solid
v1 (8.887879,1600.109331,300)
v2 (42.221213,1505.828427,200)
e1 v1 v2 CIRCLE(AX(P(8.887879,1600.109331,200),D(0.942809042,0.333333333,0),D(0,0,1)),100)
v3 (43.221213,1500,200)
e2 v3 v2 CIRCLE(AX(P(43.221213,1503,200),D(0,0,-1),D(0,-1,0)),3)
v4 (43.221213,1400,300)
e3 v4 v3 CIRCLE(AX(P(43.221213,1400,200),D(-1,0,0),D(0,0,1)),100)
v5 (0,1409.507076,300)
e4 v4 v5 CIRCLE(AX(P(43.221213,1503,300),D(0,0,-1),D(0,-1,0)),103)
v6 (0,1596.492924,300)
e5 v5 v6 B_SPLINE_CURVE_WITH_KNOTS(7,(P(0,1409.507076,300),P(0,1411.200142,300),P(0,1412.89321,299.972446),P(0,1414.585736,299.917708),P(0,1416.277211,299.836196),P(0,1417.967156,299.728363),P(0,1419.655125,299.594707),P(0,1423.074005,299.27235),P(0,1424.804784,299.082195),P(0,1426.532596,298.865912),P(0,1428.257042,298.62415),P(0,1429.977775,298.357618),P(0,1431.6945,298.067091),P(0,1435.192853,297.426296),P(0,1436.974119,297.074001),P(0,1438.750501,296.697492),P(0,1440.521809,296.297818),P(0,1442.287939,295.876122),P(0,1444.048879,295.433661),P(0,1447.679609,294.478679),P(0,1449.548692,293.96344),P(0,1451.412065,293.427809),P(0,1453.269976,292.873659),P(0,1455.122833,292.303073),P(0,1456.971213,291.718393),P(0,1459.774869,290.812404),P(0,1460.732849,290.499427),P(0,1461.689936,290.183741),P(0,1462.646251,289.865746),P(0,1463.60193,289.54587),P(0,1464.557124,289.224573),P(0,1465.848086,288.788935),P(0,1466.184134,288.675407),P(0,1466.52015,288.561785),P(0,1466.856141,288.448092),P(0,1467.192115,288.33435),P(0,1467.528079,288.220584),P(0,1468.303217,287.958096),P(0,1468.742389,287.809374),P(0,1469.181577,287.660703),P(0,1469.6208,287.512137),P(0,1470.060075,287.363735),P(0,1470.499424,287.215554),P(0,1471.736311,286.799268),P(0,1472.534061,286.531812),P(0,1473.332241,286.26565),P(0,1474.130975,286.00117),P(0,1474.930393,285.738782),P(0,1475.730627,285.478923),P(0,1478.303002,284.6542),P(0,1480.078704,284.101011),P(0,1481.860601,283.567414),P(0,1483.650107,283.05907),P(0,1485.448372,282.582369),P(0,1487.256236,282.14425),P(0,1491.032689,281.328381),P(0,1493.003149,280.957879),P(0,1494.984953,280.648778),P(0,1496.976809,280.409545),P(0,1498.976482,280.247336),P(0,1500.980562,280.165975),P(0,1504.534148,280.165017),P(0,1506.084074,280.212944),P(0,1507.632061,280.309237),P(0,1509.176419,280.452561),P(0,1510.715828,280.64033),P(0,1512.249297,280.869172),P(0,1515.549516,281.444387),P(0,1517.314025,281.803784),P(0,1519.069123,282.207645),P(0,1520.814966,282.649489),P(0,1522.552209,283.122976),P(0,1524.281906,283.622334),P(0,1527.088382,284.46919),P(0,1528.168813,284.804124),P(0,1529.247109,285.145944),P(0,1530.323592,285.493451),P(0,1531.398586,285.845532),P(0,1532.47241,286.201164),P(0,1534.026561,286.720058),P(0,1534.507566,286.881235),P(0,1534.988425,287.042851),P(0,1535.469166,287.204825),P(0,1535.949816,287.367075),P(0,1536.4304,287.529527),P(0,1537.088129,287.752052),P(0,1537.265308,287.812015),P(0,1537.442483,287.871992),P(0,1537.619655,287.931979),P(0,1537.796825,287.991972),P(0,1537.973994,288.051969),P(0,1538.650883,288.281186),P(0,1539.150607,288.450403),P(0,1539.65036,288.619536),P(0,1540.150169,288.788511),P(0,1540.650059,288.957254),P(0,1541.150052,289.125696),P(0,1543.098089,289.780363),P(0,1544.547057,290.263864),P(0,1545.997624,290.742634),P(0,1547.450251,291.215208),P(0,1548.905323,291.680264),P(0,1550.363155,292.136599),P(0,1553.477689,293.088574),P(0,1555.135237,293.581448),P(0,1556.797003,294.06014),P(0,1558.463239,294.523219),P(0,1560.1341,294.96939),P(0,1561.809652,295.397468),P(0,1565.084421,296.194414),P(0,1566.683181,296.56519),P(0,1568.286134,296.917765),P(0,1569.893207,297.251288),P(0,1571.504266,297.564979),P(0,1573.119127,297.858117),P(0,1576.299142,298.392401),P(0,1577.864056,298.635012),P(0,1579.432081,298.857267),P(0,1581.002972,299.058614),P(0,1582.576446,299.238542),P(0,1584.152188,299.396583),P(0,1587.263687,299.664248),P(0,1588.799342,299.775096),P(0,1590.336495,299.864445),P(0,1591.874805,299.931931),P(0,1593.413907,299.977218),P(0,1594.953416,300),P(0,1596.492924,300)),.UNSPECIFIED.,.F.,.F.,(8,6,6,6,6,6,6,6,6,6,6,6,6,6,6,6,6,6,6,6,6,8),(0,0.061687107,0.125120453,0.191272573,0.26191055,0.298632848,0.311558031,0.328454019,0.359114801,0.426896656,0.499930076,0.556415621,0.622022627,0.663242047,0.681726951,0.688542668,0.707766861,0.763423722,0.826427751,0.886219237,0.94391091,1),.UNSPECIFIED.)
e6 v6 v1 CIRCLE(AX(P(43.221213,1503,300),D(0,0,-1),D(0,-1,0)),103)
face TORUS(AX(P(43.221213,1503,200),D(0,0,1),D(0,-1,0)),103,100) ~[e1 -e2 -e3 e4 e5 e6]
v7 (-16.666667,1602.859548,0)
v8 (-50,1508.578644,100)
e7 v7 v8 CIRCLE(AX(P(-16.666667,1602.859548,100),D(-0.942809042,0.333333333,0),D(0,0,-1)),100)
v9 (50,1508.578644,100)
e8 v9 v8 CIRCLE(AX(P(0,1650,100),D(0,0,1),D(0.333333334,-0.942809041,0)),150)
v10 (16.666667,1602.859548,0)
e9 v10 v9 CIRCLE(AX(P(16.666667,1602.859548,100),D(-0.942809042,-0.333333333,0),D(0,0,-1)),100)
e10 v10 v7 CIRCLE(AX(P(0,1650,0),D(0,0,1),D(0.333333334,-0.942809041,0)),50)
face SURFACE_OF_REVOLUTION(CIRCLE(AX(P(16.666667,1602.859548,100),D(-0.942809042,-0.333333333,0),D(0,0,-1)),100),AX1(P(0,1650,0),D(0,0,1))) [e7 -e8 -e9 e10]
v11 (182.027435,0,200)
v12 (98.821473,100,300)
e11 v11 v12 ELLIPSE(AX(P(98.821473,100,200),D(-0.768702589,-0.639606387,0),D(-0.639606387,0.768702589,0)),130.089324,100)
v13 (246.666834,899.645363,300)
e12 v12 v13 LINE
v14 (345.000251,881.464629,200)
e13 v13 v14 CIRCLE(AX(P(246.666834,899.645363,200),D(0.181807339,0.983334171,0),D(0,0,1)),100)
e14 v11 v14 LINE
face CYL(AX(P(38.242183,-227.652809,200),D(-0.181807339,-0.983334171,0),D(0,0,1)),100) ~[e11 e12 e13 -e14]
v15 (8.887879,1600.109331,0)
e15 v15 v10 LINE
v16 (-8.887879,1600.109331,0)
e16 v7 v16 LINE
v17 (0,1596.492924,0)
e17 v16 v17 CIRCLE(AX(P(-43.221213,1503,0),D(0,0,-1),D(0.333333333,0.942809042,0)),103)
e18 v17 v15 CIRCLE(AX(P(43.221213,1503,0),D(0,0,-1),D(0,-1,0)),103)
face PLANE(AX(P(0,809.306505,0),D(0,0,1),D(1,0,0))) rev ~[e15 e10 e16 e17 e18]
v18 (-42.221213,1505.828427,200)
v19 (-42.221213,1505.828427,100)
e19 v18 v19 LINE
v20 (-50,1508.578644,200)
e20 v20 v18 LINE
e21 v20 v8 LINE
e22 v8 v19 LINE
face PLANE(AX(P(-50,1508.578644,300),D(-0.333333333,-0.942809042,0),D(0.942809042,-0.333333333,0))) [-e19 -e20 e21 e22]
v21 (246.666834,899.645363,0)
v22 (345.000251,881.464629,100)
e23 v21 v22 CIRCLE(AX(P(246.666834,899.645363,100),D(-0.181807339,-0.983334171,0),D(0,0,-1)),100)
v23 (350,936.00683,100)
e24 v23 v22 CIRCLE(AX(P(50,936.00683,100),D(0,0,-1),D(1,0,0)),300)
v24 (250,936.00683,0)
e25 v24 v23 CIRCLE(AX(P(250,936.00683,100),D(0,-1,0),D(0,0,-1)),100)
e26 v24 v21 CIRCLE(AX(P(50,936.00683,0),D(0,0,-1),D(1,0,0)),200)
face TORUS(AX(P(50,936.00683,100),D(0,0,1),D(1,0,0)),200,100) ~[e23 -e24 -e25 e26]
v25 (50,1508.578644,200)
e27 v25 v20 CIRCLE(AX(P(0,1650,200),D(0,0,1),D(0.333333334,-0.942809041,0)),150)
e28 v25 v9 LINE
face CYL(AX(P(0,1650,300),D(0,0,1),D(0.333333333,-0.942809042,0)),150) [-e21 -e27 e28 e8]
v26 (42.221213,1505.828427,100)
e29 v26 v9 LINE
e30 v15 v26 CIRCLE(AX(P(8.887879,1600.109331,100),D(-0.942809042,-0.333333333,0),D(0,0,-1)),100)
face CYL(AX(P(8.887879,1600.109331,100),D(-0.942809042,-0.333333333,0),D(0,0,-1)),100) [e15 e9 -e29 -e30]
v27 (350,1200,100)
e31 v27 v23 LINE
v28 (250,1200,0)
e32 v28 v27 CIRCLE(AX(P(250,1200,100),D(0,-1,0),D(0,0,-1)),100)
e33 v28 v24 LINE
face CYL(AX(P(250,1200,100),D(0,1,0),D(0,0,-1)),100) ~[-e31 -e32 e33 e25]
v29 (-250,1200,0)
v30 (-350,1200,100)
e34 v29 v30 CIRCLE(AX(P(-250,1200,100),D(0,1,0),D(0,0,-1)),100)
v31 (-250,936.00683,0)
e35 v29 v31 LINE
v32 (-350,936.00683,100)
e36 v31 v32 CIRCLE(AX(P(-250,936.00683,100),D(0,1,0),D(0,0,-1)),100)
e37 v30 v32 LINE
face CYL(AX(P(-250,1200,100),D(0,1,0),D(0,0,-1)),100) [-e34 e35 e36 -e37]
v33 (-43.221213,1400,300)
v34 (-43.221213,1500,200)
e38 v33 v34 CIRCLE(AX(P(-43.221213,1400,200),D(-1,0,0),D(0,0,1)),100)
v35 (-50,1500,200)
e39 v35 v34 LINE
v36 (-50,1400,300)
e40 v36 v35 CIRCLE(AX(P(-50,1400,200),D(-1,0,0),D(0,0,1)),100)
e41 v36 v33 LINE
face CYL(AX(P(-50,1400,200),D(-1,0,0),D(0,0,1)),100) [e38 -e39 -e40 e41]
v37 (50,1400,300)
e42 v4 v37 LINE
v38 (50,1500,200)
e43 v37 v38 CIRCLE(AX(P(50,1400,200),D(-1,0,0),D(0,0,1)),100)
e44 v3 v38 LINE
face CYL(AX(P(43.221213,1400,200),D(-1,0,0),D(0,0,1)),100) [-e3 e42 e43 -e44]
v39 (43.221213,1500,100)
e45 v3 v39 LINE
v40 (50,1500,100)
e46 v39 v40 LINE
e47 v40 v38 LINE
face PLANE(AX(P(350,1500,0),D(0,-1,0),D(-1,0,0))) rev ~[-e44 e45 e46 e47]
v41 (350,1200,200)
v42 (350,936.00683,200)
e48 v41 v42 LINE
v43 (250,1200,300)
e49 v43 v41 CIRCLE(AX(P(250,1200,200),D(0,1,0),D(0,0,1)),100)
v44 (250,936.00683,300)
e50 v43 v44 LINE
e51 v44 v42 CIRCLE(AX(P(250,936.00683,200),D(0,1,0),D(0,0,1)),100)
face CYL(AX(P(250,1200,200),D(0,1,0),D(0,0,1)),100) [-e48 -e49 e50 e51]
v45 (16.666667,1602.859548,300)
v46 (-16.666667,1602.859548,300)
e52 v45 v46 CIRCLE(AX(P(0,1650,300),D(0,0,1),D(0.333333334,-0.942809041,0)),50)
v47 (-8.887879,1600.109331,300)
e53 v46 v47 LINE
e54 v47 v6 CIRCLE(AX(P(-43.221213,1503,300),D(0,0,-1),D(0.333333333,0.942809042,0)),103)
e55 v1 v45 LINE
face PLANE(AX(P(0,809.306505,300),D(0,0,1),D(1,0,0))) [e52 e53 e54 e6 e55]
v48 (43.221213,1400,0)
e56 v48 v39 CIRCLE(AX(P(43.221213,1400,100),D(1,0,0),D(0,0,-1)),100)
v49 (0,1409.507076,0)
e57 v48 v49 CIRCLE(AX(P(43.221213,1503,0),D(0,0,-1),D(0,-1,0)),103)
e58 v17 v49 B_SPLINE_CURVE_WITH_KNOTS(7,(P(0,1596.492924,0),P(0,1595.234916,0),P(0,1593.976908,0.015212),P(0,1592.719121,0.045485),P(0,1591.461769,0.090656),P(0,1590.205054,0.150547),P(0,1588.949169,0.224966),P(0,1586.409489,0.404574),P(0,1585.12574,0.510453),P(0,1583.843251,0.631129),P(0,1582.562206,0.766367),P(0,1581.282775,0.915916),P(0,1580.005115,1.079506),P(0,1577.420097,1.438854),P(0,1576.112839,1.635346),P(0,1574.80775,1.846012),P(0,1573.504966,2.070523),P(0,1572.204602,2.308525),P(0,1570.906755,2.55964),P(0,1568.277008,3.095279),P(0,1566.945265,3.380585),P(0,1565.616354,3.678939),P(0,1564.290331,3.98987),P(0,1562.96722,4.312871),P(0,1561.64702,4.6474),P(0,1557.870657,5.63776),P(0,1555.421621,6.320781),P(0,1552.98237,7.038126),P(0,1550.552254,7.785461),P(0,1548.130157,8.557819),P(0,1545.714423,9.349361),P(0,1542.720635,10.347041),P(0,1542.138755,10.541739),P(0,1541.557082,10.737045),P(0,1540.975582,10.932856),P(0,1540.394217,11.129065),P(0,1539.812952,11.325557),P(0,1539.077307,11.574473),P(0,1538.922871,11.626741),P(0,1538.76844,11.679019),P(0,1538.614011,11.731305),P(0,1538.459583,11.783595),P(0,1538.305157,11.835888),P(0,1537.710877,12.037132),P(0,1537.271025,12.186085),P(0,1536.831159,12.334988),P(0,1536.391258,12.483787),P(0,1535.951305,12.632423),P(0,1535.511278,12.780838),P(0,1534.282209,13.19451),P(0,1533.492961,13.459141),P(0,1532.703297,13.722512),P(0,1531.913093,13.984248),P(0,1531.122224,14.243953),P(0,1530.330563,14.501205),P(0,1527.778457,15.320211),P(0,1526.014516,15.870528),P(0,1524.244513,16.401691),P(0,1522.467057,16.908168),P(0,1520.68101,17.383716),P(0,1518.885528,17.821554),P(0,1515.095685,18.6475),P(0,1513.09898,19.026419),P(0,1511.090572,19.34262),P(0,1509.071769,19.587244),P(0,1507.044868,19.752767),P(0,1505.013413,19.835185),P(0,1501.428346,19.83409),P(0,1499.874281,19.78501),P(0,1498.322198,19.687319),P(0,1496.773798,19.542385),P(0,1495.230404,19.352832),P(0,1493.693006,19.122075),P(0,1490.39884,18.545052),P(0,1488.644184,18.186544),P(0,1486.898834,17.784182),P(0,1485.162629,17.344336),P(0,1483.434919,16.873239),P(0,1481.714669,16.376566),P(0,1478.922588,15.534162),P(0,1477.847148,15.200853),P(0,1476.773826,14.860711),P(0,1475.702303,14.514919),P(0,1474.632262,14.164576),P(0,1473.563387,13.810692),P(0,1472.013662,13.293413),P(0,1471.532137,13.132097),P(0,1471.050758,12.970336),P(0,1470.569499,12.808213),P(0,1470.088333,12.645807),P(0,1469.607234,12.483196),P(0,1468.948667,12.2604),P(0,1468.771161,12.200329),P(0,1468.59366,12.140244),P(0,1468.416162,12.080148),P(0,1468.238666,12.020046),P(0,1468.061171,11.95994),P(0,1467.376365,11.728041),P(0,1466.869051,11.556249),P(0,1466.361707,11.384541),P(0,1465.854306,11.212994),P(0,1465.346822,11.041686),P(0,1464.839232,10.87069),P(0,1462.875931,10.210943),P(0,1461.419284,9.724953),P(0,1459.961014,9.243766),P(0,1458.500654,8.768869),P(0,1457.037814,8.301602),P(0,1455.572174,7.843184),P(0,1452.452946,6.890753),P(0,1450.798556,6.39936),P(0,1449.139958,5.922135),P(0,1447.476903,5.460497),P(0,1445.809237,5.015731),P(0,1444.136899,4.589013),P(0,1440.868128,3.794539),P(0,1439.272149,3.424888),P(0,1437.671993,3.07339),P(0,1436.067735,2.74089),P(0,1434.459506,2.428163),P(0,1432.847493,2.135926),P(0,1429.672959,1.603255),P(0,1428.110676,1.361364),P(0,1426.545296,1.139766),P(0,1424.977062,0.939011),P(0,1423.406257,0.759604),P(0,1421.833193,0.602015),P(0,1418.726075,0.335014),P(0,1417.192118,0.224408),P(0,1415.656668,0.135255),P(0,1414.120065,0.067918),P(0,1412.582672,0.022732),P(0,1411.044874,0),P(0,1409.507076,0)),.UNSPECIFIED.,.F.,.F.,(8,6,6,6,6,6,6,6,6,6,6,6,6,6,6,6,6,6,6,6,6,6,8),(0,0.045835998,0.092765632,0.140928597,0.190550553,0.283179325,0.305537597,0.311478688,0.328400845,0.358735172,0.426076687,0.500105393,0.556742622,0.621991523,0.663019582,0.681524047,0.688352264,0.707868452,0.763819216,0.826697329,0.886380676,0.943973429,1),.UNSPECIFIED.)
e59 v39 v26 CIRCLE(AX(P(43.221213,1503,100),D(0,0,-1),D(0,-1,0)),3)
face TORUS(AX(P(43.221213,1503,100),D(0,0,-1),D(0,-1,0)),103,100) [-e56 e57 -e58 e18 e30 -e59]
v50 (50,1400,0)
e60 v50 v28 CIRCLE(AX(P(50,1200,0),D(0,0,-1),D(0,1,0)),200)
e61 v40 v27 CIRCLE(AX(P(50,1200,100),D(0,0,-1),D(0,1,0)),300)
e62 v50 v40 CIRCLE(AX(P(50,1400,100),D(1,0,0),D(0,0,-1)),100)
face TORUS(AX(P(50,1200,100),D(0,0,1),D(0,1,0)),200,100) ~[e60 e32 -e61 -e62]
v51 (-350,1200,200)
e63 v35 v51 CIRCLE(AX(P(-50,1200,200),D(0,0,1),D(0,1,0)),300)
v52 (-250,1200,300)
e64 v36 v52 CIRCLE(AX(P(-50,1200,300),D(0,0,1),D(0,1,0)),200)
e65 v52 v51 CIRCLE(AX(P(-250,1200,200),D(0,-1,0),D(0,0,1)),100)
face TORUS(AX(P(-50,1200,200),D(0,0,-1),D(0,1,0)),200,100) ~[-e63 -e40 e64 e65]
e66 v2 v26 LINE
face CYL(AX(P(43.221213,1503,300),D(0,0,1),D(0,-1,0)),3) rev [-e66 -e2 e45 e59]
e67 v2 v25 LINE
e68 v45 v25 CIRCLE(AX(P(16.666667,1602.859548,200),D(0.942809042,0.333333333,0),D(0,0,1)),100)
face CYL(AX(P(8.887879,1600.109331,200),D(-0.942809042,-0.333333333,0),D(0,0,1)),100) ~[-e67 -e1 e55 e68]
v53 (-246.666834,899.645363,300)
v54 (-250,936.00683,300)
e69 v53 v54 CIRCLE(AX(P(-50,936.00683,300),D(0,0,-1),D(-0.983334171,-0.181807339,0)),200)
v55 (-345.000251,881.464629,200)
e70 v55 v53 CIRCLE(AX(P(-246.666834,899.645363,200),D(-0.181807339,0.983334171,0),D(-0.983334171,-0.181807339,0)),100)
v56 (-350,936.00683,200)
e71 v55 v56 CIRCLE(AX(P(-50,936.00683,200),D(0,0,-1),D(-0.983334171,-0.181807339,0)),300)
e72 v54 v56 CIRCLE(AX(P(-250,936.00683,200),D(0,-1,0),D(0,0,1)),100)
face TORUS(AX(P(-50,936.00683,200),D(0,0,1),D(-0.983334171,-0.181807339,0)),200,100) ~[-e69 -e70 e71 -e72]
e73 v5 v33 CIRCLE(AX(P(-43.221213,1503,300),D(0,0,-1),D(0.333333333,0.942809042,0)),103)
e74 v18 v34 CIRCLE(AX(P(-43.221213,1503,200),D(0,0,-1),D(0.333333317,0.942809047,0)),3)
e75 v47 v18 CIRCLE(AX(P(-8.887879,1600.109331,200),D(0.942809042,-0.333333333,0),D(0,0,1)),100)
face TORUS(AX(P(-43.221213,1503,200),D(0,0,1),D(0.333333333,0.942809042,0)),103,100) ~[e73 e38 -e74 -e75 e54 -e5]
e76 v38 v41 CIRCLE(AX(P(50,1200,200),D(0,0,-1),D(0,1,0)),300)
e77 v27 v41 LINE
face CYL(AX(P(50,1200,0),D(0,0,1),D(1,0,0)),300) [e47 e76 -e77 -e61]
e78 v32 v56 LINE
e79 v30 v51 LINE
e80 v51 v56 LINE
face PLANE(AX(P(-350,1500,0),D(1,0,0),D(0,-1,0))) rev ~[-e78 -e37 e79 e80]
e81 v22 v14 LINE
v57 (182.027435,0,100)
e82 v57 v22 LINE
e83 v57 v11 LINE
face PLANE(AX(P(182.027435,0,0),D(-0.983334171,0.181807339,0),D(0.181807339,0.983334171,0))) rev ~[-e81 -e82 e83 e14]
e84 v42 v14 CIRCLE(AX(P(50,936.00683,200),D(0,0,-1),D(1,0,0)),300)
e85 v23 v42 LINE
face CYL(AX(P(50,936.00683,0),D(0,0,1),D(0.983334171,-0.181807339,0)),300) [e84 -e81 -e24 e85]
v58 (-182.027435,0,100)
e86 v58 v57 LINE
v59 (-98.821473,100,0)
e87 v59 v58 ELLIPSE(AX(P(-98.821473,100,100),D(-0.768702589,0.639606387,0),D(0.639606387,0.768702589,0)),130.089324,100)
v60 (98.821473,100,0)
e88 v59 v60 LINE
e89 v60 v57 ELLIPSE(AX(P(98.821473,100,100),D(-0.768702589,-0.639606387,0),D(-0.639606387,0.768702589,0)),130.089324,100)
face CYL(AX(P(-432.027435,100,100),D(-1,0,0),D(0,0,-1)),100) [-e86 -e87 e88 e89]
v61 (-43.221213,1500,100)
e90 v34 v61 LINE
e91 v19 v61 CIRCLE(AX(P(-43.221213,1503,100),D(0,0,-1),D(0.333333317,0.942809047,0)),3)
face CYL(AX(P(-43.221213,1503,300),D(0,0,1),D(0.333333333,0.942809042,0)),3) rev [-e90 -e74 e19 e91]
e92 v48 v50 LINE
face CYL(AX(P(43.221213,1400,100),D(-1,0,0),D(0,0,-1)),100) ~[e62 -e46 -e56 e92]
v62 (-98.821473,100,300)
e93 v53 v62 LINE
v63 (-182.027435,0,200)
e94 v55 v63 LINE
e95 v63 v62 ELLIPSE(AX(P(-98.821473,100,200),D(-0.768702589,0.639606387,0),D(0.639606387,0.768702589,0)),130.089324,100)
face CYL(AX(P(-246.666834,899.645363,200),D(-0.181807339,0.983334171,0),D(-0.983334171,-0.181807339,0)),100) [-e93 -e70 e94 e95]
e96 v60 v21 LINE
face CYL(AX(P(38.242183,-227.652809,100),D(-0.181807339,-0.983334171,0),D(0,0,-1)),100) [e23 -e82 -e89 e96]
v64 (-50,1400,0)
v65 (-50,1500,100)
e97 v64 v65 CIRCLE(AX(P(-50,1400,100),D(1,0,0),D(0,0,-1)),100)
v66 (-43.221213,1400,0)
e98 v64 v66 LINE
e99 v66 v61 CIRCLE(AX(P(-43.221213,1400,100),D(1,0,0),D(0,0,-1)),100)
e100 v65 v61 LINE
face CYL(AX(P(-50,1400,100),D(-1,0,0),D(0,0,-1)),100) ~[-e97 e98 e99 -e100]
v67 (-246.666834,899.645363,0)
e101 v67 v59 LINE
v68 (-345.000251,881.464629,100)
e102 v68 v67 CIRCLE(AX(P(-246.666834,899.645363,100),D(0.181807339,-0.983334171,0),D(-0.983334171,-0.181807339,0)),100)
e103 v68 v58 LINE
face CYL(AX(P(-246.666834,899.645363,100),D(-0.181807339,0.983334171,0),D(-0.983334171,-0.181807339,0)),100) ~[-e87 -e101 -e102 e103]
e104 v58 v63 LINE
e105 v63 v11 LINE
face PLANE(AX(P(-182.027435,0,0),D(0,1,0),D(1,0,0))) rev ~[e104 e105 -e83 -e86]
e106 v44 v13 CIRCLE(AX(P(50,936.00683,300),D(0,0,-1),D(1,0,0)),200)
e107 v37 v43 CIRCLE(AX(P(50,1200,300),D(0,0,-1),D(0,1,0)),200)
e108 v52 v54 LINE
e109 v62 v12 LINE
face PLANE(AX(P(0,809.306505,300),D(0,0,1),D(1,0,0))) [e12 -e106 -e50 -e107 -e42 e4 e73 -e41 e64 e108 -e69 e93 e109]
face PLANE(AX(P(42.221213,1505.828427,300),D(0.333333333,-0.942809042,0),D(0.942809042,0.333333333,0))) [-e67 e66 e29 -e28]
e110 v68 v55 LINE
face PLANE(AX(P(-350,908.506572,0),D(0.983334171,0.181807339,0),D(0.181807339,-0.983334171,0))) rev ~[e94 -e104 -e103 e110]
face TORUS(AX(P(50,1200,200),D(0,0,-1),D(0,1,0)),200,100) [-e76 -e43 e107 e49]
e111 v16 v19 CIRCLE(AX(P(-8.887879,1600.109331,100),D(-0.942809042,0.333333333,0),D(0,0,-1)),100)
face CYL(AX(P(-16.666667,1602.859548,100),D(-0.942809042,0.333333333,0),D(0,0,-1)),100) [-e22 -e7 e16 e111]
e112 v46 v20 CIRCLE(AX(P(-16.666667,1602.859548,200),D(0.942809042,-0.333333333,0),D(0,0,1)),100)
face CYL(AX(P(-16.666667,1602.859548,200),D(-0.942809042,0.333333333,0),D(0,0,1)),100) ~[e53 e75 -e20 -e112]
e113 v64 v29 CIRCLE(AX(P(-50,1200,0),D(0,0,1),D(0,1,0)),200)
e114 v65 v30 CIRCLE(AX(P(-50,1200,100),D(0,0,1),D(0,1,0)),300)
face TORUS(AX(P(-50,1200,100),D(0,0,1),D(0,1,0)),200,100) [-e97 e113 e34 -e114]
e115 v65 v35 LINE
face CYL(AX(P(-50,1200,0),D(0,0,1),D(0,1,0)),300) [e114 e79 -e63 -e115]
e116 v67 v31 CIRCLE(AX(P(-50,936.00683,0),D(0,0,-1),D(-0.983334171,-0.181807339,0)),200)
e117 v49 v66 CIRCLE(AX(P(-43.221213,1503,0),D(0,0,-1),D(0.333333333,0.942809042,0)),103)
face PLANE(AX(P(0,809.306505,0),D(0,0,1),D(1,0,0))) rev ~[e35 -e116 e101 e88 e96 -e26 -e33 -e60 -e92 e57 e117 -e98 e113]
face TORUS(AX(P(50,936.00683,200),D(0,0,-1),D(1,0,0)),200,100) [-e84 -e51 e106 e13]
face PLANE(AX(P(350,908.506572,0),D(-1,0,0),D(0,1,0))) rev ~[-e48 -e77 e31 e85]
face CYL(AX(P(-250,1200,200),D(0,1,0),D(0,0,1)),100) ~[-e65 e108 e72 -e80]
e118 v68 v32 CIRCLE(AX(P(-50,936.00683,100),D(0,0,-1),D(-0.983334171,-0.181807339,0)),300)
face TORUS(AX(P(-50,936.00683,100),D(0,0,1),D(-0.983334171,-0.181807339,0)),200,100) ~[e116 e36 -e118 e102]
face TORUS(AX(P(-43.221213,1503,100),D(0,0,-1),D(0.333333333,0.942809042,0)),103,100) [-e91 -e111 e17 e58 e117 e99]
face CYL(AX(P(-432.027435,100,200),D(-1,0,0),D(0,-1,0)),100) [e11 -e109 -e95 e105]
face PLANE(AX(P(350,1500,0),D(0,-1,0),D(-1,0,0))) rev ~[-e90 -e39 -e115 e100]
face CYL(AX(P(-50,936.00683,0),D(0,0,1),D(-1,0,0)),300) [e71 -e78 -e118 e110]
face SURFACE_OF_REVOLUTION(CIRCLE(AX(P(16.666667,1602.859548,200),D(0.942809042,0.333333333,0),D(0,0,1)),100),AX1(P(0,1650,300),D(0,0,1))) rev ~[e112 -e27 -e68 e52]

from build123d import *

# Parameters (mm, degrees)
F1_DEPTH     = 300
F2_R         = 300
F4_DEPTH     = 300
F5_T1_DEPTH  = 1146.4039437128
F5_T3_DEPTH  = 864.0548707486
F5_T5_DEPTH  = 1146.4039437128
F5_T7_DEPTH  = 263.9931695697
F5_T9_DEPTH  = 6.7787873377
F5_T11_DEPTH = 8.2506499138
F5_T13_DEPTH = 8.2506499138
F5_T15_DEPTH = 6.7787873377
F5_T18_ANGLE = 10.4750499308
F5_T20_ANGLE = 90
F5_T22_ANGLE = 160.5287793655
F5_T24_ANGLE = 321.057558731
F5_T26_ANGLE = 160.5287793655
F5_T28_ANGLE = 90
F5_T30_ANGLE = 10.4750499308
F5_T32_ANGLE = 10.4750499308
F5_T34_ANGLE = 90
F5_T36_ANGLE = 160.5287793655
F5_T38_ANGLE = 321.057558731
F5_T40_ANGLE = 160.5287793655
F5_T42_ANGLE = 90
F5_T44_ANGLE = 10.4750499308


# Not quite as in the source:
# - a fillet or chamfer that OpenCascade refuses, or shapes differently, is made with other operations: its cross-section is extruded or revolved along the edge and cut away or added


with BuildPart() as f1:
    # F0 (on Top) → F1 (new body)
    with BuildSketch(Plane.XY):
        Polygon((-182.0274353743, 0), (0, 0), (182.0274353743, 0), (350, 908.5065722466), (350, 1500), (-350, 1500), (-350, 908.5065722466), align=None)
    extrude(amount=F1_DEPTH)

    # F2
    f2_edges = [f1.edges().sort_by_distance(p)[0] for p in [
        (350, 1500, 150),
        (-350, 1500, 150),
        (-350, 908.506572, 150),
        (350, 908.506572, 150),
    ]]
    fillet(f2_edges, radius=F2_R)

    # F3 (on face) → F4 (join, through all)
    with BuildSketch(Plane.XY.offset(300)):
        with BuildLine():
            ThreePointArc((50, 1508.5786437627), (122.4744871392, 1563.3974596216), (150, 1650))
            ThreePointArc((150, 1650), (-86.6025403784, 1772.4744871392), (-50, 1508.5786437627))
            ThreePointArc((-50, 1508.5786437627), (0, 1500), (50, 1508.5786437627))
        make_face()
        with BuildLine():
            Line((42.2212126623, 1505.8284271247), (50, 1508.5786437627))
            ThreePointArc((50, 1508.5786437627), (25.3652965741, 1502.1602160117), (-4.764e-07, 1500))
            Line((-4.764e-07, 1500), (43.2212126623, 1500))
            ThreePointArc((43.2212126623, 1500), (40.2644169833, 1502.4926940638), (42.2212126623, 1505.8284271247))
        make_face()
        with BuildLine():
            ThreePointArc((-4.764e-07, 1500), (-25.3652970436, 1502.1602160923), (-50, 1508.5786437627))
            Line((-50, 1508.5786437627), (-42.2212126623, 1505.8284271247))
            ThreePointArc((-42.2212126623, 1505.8284271247), (-40.2644169834, 1502.4926940638), (-43.2212126623, 1500))
            Line((-43.2212126623, 1500), (-4.764e-07, 1500))
        make_face()
    extrude(amount=-F4_DEPTH)

    # F5: fillet of radius 100 on 32 edges, made by hand

    # F5_s2 → F5_t1 (cut)
    with BuildSketch(Plane(origin=(-168.9895340673, 914.0070146762, 0), x_dir=(0, 0, 1), z_dir=(0.1818073392, -0.9833341708, 0))):
        with BuildLine():
            ThreePointArc((100, 178.9937972219), (29.2893218813, 149.7044753406), (0, 78.9937972219))
            Line((0, 78.9937972219), (0, 178.9937972219))
            Line((0, 178.9937972219), (100, 178.9937972219))
        make_face()
        with BuildLine():
            ThreePointArc((200, 178.9937972219), (270.7106781187, 149.7044753406), (300, 78.9937972219))
            Line((300, 78.9937972219), (300, 178.9937972219))
            Line((300, 178.9937972219), (200, 178.9937972219))
        make_face()
    extrude(amount=F5_T1_DEPTH, mode=Mode.SUBTRACT)

    # F5_s4 → F5_t3 (cut)
    with BuildSketch(Plane.YZ.offset(-432.0274353743)):
        with BuildLine():
            ThreePointArc((100, 0), (29.2893218813, 29.2893218813), (0, 100))
            Line((0, 100), (0, 0))
            Line((0, 0), (100, 0))
        make_face()
        with BuildLine():
            ThreePointArc((0, 200), (29.2893218813, 270.7106781187), (100, 300))
            Line((100, 300), (0, 300))
            Line((0, 300), (0, 200))
        make_face()
    extrude(amount=F5_T3_DEPTH, mode=Mode.SUBTRACT)

    # F5_s6 → F5_t5 (cut)
    with BuildSketch(Plane(origin=(-39.4351165914, -213.2911566867, 0), x_dir=(0, 0, 1), z_dir=(0.1818073392, 0.9833341708, 0))):
        with BuildLine():
            ThreePointArc((0, 78.9937972219), (29.2893218813, 149.7044753406), (100, 178.9937972219))
            Line((100, 178.9937972219), (0, 178.9937972219))
            Line((0, 178.9937972219), (0, 78.9937972219))
        make_face()
        with BuildLine():
            ThreePointArc((300, 78.9937972219), (270.7106781187, 149.7044753406), (200, 178.9937972219))
            Line((200, 178.9937972219), (300, 178.9937972219))
            Line((300, 178.9937972219), (300, 78.9937972219))
        make_face()
    extrude(amount=F5_T5_DEPTH, mode=Mode.SUBTRACT)

    # F5_s8 → F5_t7 (cut)
    with BuildSketch(Plane.XZ.offset(-1200)):
        with BuildLine():
            ThreePointArc((250, 0), (320.7106781187, 29.2893218813), (350, 100))
            Line((350, 100), (350, 0))
            Line((350, 0), (250, 0))
        make_face()
        with BuildLine():
            ThreePointArc((-250, 0), (-320.7106781187, 29.2893218813), (-350, 100))
            Line((-350, 100), (-350, 0))
            Line((-350, 0), (-250, 0))
        make_face()
        with BuildLine():
            ThreePointArc((250, 300), (320.7106781187, 270.7106781187), (350, 200))
            Line((350, 200), (350, 300))
            Line((350, 300), (250, 300))
        make_face()
        with BuildLine():
            ThreePointArc((-250, 300), (-320.7106781187, 270.7106781187), (-350, 200))
            Line((-350, 200), (-350, 300))
            Line((-350, 300), (-250, 300))
        make_face()
    extrude(amount=F5_T7_DEPTH, mode=Mode.SUBTRACT)

    # F5_s10 → F5_t9 (cut)
    with BuildSketch(Plane.YZ.offset(43.2212126623)):
        with BuildLine():
            ThreePointArc((1400, 0), (1470.7106781187, 29.2893218813), (1500, 100))
            Line((1500, 100), (1500, 0))
            Line((1500, 0), (1400, 0))
        make_face()
        with BuildLine():
            ThreePointArc((1400, 300), (1470.7106781187, 270.7106781187), (1500, 200))
            Line((1500, 200), (1500, 300))
            Line((1500, 300), (1400, 300))
        make_face()
    extrude(amount=F5_T9_DEPTH, mode=Mode.SUBTRACT)

    # F5_s12 → F5_t11 (cut)
    with BuildSketch(Plane(origin=(510.7661855325, 180.5831166954, 0), x_dir=(0, 0, 1), z_dir=(0.9428090416, 0.3333333333, 0))):
        with BuildLine():
            ThreePointArc((0, -1505.6349186104), (29.2893218813, -1434.9242404917), (100, -1405.6349186104))
            Line((100, -1405.6349186104), (0, -1405.6349186104))
            Line((0, -1405.6349186104), (0, -1505.6349186104))
        make_face()
        with BuildLine():
            ThreePointArc((300, -1505.6349186104), (270.7106781187, -1434.9242404917), (200, -1405.6349186104))
            Line((200, -1405.6349186104), (300, -1405.6349186104))
            Line((300, -1405.6349186104), (300, -1505.6349186104))
        make_face()
    extrude(amount=F5_T11_DEPTH, mode=Mode.SUBTRACT)

    # F5_s14 → F5_t13 (cut)
    with BuildSketch(Plane(origin=(-518.5449728702, 183.3333333334, 0), x_dir=(0, 0, 1), z_dir=(0.9428090416, -0.3333333333, 0))):
        with BuildLine():
            ThreePointArc((0, -1505.6349186104), (29.2893218813, -1434.9242404917), (100, -1405.6349186104))
            Line((100, -1405.6349186104), (0, -1405.6349186104))
            Line((0, -1405.6349186104), (0, -1505.6349186104))
        make_face()
        with BuildLine():
            ThreePointArc((300, -1505.6349186104), (270.7106781187, -1434.9242404917), (200, -1405.6349186104))
            Line((200, -1405.6349186104), (300, -1405.6349186104))
            Line((300, -1405.6349186104), (300, -1505.6349186104))
        make_face()
    extrude(amount=F5_T13_DEPTH, mode=Mode.SUBTRACT)

    # F5_s16 → F5_t15 (cut)
    with BuildSketch(Plane.YZ.offset(-50)):
        with BuildLine():
            ThreePointArc((1400, 0), (1470.7106781187, 29.2893218813), (1500, 100))
            Line((1500, 100), (1500, 0))
            Line((1500, 0), (1400, 0))
        make_face()
        with BuildLine():
            ThreePointArc((1400, 300), (1470.7106781187, 270.7106781187), (1500, 200))
            Line((1500, 200), (1500, 300))
            Line((1500, 300), (1400, 300))
        make_face()
    extrude(amount=F5_T15_DEPTH, mode=Mode.SUBTRACT)

    # F5_s17 → F5_t18 (revolve, cut)
    with BuildSketch(Plane.XZ.offset(-936.0068304303)):
        with BuildLine():
            ThreePointArc((250, 0), (320.7106781187, 29.2893218813), (350, 100))
            Line((350, 100), (350, 0))
            Line((350, 0), (250, 0))
        make_face()
    revolve(axis=Axis((50, 936.0068304303, 0), (0, 0, -1)), revolution_arc=F5_T18_ANGLE, mode=Mode.SUBTRACT)

    # F5_s19 → F5_t20 (revolve, cut)
    with BuildSketch(Plane.YZ.offset(50)):
        with BuildLine():
            ThreePointArc((1400, 0), (1470.7106781187, 29.2893218813), (1500, 100))
            Line((1500, 100), (1500, 0))
            Line((1500, 0), (1400, 0))
        make_face()
    revolve(axis=Axis((50, 1200, 0), (0, 0, -1)), revolution_arc=F5_T20_ANGLE, mode=Mode.SUBTRACT)

    # F5_s21 → F5_t22 (revolve, cut)
    with BuildSketch(Plane.YZ.offset(43.2212126623)):
        with BuildLine():
            ThreePointArc((1400, 0), (1470.7106781187, 29.2893218813), (1500, 100))
            Line((1500, 100), (1500, 0))
            Line((1500, 0), (1400, 0))
        make_face()
    revolve(axis=Axis((43.2212126623, 1503, 0), (0, 0, -1)), revolution_arc=F5_T22_ANGLE, mode=Mode.SUBTRACT)

    # F5_s23 → F5_t24 (revolve, cut)
    with BuildSketch(Plane(origin=(518.5449728701, 183.3333333333, 0), x_dir=(0, 0, 1), z_dir=(-0.9428090416, -0.3333333333, 0))):
        with BuildLine():
            ThreePointArc((0, 1505.6349186104), (29.2893218813, 1434.9242404917), (100, 1405.6349186104))
            Line((100, 1405.6349186104), (0, 1405.6349186104))
            Line((0, 1405.6349186104), (0, 1505.6349186104))
        make_face()
    revolve(axis=Axis((0, 1650, 0), (0, 0, 1)), revolution_arc=F5_T24_ANGLE, mode=Mode.SUBTRACT)

    # F5_s25 → F5_t26 (revolve, cut)
    with BuildSketch(Plane(origin=(-510.7661855325, 180.5831166954, 0), x_dir=(0, 0, 1), z_dir=(-0.9428090416, 0.3333333333, 0))):
        with BuildLine():
            ThreePointArc((0, 1505.6349186104), (29.2893218813, 1434.9242404917), (100, 1405.6349186104))
            Line((100, 1405.6349186104), (0, 1405.6349186104))
            Line((0, 1405.6349186104), (0, 1505.6349186104))
        make_face()
    revolve(axis=Axis((-43.2212126623, 1503, 0), (0, 0, -1)), revolution_arc=F5_T26_ANGLE, mode=Mode.SUBTRACT)

    # F5_s27 → F5_t28 (revolve, cut)
    with BuildSketch(Plane.YZ.offset(-50)):
        with BuildLine():
            ThreePointArc((1400, 0), (1470.7106781187, 29.2893218813), (1500, 100))
            Line((1500, 100), (1500, 0))
            Line((1500, 0), (1400, 0))
        make_face()
    revolve(axis=Axis((-50, 1200, 0), (0, 0, 1)), revolution_arc=F5_T28_ANGLE, mode=Mode.SUBTRACT)

    # F5_s29 → F5_t30 (revolve, cut)
    with BuildSketch(Plane(origin=(-168.9895340673, 914.0070146762, 0), x_dir=(0, 0, 1), z_dir=(0.1818073392, -0.9833341708, 0))):
        with BuildLine():
            ThreePointArc((0, 78.9937972219), (29.2893218813, 149.7044753406), (100, 178.9937972219))
            Line((100, 178.9937972219), (0, 178.9937972219))
            Line((0, 178.9937972219), (0, 78.9937972219))
        make_face()
    revolve(axis=Axis((-50, 936.0068304303, 0), (0, 0, -1)), revolution_arc=F5_T30_ANGLE, mode=Mode.SUBTRACT)

    # F5_s31 → F5_t32 (revolve, cut)
    with BuildSketch(Plane.XZ.offset(-936.0068304303)):
        with BuildLine():
            ThreePointArc((250, 300), (320.7106781187, 270.7106781187), (350, 200))
            Line((350, 200), (350, 300))
            Line((350, 300), (250, 300))
        make_face()
    revolve(axis=Axis((50, 936.0068304303, 300), (0, 0, -1)), revolution_arc=F5_T32_ANGLE, mode=Mode.SUBTRACT)

    # F5_s33 → F5_t34 (revolve, cut)
    with BuildSketch(Plane.YZ.offset(50)):
        with BuildLine():
            ThreePointArc((1400, 300), (1470.7106781187, 270.7106781187), (1500, 200))
            Line((1500, 200), (1500, 300))
            Line((1500, 300), (1400, 300))
        make_face()
    revolve(axis=Axis((50, 1200, 300), (0, 0, -1)), revolution_arc=F5_T34_ANGLE, mode=Mode.SUBTRACT)

    # F5_s35 → F5_t36 (revolve, cut)
    with BuildSketch(Plane.YZ.offset(43.2212126623)):
        with BuildLine():
            ThreePointArc((1400, 300), (1470.7106781187, 270.7106781187), (1500, 200))
            Line((1500, 200), (1500, 300))
            Line((1500, 300), (1400, 300))
        make_face()
    revolve(axis=Axis((43.2212126623, 1503, 300), (0, 0, -1)), revolution_arc=F5_T36_ANGLE, mode=Mode.SUBTRACT)

    # F5_s37 → F5_t38 (revolve, cut)
    with BuildSketch(Plane(origin=(518.5449728701, 183.3333333333, 0), x_dir=(0, 0, 1), z_dir=(-0.9428090416, -0.3333333333, 0))):
        with BuildLine():
            ThreePointArc((300, 1505.6349186104), (270.7106781187, 1434.9242404917), (200, 1405.6349186104))
            Line((200, 1405.6349186104), (300, 1405.6349186104))
            Line((300, 1405.6349186104), (300, 1505.6349186104))
        make_face()
    revolve(axis=Axis((0, 1650, 300), (0, 0, 1)), revolution_arc=F5_T38_ANGLE, mode=Mode.SUBTRACT)

    # F5_s39 → F5_t40 (revolve, cut)
    with BuildSketch(Plane(origin=(-510.7661855325, 180.5831166954, 0), x_dir=(0, 0, 1), z_dir=(-0.9428090416, 0.3333333333, 0))):
        with BuildLine():
            ThreePointArc((300, 1505.6349186104), (270.7106781187, 1434.9242404917), (200, 1405.6349186104))
            Line((200, 1405.6349186104), (300, 1405.6349186104))
            Line((300, 1405.6349186104), (300, 1505.6349186104))
        make_face()
    revolve(axis=Axis((-43.2212126623, 1503, 300), (0, 0, -1)), revolution_arc=F5_T40_ANGLE, mode=Mode.SUBTRACT)

    # F5_s41 → F5_t42 (revolve, cut)
    with BuildSketch(Plane.YZ.offset(-50)):
        with BuildLine():
            ThreePointArc((1400, 300), (1470.7106781187, 270.7106781187), (1500, 200))
            Line((1500, 200), (1500, 300))
            Line((1500, 300), (1400, 300))
        make_face()
    revolve(axis=Axis((-50, 1200, 300), (0, 0, 1)), revolution_arc=F5_T42_ANGLE, mode=Mode.SUBTRACT)

    # F5_s43 → F5_t44 (revolve, cut)
    with BuildSketch(Plane(origin=(-168.9895340673, 914.0070146762, 0), x_dir=(0, 0, 1), z_dir=(0.1818073392, -0.9833341708, 0))):
        with BuildLine():
            ThreePointArc((200, 178.9937972219), (270.7106781187, 149.7044753406), (300, 78.9937972219))
            Line((300, 78.9937972219), (300, 178.9937972219))
            Line((300, 178.9937972219), (200, 178.9937972219))
        make_face()
    revolve(axis=Axis((-50, 936.0068304303, 300), (0, 0, -1)), revolution_arc=F5_T44_ANGLE, mode=Mode.SUBTRACT)


solid = f1.part
